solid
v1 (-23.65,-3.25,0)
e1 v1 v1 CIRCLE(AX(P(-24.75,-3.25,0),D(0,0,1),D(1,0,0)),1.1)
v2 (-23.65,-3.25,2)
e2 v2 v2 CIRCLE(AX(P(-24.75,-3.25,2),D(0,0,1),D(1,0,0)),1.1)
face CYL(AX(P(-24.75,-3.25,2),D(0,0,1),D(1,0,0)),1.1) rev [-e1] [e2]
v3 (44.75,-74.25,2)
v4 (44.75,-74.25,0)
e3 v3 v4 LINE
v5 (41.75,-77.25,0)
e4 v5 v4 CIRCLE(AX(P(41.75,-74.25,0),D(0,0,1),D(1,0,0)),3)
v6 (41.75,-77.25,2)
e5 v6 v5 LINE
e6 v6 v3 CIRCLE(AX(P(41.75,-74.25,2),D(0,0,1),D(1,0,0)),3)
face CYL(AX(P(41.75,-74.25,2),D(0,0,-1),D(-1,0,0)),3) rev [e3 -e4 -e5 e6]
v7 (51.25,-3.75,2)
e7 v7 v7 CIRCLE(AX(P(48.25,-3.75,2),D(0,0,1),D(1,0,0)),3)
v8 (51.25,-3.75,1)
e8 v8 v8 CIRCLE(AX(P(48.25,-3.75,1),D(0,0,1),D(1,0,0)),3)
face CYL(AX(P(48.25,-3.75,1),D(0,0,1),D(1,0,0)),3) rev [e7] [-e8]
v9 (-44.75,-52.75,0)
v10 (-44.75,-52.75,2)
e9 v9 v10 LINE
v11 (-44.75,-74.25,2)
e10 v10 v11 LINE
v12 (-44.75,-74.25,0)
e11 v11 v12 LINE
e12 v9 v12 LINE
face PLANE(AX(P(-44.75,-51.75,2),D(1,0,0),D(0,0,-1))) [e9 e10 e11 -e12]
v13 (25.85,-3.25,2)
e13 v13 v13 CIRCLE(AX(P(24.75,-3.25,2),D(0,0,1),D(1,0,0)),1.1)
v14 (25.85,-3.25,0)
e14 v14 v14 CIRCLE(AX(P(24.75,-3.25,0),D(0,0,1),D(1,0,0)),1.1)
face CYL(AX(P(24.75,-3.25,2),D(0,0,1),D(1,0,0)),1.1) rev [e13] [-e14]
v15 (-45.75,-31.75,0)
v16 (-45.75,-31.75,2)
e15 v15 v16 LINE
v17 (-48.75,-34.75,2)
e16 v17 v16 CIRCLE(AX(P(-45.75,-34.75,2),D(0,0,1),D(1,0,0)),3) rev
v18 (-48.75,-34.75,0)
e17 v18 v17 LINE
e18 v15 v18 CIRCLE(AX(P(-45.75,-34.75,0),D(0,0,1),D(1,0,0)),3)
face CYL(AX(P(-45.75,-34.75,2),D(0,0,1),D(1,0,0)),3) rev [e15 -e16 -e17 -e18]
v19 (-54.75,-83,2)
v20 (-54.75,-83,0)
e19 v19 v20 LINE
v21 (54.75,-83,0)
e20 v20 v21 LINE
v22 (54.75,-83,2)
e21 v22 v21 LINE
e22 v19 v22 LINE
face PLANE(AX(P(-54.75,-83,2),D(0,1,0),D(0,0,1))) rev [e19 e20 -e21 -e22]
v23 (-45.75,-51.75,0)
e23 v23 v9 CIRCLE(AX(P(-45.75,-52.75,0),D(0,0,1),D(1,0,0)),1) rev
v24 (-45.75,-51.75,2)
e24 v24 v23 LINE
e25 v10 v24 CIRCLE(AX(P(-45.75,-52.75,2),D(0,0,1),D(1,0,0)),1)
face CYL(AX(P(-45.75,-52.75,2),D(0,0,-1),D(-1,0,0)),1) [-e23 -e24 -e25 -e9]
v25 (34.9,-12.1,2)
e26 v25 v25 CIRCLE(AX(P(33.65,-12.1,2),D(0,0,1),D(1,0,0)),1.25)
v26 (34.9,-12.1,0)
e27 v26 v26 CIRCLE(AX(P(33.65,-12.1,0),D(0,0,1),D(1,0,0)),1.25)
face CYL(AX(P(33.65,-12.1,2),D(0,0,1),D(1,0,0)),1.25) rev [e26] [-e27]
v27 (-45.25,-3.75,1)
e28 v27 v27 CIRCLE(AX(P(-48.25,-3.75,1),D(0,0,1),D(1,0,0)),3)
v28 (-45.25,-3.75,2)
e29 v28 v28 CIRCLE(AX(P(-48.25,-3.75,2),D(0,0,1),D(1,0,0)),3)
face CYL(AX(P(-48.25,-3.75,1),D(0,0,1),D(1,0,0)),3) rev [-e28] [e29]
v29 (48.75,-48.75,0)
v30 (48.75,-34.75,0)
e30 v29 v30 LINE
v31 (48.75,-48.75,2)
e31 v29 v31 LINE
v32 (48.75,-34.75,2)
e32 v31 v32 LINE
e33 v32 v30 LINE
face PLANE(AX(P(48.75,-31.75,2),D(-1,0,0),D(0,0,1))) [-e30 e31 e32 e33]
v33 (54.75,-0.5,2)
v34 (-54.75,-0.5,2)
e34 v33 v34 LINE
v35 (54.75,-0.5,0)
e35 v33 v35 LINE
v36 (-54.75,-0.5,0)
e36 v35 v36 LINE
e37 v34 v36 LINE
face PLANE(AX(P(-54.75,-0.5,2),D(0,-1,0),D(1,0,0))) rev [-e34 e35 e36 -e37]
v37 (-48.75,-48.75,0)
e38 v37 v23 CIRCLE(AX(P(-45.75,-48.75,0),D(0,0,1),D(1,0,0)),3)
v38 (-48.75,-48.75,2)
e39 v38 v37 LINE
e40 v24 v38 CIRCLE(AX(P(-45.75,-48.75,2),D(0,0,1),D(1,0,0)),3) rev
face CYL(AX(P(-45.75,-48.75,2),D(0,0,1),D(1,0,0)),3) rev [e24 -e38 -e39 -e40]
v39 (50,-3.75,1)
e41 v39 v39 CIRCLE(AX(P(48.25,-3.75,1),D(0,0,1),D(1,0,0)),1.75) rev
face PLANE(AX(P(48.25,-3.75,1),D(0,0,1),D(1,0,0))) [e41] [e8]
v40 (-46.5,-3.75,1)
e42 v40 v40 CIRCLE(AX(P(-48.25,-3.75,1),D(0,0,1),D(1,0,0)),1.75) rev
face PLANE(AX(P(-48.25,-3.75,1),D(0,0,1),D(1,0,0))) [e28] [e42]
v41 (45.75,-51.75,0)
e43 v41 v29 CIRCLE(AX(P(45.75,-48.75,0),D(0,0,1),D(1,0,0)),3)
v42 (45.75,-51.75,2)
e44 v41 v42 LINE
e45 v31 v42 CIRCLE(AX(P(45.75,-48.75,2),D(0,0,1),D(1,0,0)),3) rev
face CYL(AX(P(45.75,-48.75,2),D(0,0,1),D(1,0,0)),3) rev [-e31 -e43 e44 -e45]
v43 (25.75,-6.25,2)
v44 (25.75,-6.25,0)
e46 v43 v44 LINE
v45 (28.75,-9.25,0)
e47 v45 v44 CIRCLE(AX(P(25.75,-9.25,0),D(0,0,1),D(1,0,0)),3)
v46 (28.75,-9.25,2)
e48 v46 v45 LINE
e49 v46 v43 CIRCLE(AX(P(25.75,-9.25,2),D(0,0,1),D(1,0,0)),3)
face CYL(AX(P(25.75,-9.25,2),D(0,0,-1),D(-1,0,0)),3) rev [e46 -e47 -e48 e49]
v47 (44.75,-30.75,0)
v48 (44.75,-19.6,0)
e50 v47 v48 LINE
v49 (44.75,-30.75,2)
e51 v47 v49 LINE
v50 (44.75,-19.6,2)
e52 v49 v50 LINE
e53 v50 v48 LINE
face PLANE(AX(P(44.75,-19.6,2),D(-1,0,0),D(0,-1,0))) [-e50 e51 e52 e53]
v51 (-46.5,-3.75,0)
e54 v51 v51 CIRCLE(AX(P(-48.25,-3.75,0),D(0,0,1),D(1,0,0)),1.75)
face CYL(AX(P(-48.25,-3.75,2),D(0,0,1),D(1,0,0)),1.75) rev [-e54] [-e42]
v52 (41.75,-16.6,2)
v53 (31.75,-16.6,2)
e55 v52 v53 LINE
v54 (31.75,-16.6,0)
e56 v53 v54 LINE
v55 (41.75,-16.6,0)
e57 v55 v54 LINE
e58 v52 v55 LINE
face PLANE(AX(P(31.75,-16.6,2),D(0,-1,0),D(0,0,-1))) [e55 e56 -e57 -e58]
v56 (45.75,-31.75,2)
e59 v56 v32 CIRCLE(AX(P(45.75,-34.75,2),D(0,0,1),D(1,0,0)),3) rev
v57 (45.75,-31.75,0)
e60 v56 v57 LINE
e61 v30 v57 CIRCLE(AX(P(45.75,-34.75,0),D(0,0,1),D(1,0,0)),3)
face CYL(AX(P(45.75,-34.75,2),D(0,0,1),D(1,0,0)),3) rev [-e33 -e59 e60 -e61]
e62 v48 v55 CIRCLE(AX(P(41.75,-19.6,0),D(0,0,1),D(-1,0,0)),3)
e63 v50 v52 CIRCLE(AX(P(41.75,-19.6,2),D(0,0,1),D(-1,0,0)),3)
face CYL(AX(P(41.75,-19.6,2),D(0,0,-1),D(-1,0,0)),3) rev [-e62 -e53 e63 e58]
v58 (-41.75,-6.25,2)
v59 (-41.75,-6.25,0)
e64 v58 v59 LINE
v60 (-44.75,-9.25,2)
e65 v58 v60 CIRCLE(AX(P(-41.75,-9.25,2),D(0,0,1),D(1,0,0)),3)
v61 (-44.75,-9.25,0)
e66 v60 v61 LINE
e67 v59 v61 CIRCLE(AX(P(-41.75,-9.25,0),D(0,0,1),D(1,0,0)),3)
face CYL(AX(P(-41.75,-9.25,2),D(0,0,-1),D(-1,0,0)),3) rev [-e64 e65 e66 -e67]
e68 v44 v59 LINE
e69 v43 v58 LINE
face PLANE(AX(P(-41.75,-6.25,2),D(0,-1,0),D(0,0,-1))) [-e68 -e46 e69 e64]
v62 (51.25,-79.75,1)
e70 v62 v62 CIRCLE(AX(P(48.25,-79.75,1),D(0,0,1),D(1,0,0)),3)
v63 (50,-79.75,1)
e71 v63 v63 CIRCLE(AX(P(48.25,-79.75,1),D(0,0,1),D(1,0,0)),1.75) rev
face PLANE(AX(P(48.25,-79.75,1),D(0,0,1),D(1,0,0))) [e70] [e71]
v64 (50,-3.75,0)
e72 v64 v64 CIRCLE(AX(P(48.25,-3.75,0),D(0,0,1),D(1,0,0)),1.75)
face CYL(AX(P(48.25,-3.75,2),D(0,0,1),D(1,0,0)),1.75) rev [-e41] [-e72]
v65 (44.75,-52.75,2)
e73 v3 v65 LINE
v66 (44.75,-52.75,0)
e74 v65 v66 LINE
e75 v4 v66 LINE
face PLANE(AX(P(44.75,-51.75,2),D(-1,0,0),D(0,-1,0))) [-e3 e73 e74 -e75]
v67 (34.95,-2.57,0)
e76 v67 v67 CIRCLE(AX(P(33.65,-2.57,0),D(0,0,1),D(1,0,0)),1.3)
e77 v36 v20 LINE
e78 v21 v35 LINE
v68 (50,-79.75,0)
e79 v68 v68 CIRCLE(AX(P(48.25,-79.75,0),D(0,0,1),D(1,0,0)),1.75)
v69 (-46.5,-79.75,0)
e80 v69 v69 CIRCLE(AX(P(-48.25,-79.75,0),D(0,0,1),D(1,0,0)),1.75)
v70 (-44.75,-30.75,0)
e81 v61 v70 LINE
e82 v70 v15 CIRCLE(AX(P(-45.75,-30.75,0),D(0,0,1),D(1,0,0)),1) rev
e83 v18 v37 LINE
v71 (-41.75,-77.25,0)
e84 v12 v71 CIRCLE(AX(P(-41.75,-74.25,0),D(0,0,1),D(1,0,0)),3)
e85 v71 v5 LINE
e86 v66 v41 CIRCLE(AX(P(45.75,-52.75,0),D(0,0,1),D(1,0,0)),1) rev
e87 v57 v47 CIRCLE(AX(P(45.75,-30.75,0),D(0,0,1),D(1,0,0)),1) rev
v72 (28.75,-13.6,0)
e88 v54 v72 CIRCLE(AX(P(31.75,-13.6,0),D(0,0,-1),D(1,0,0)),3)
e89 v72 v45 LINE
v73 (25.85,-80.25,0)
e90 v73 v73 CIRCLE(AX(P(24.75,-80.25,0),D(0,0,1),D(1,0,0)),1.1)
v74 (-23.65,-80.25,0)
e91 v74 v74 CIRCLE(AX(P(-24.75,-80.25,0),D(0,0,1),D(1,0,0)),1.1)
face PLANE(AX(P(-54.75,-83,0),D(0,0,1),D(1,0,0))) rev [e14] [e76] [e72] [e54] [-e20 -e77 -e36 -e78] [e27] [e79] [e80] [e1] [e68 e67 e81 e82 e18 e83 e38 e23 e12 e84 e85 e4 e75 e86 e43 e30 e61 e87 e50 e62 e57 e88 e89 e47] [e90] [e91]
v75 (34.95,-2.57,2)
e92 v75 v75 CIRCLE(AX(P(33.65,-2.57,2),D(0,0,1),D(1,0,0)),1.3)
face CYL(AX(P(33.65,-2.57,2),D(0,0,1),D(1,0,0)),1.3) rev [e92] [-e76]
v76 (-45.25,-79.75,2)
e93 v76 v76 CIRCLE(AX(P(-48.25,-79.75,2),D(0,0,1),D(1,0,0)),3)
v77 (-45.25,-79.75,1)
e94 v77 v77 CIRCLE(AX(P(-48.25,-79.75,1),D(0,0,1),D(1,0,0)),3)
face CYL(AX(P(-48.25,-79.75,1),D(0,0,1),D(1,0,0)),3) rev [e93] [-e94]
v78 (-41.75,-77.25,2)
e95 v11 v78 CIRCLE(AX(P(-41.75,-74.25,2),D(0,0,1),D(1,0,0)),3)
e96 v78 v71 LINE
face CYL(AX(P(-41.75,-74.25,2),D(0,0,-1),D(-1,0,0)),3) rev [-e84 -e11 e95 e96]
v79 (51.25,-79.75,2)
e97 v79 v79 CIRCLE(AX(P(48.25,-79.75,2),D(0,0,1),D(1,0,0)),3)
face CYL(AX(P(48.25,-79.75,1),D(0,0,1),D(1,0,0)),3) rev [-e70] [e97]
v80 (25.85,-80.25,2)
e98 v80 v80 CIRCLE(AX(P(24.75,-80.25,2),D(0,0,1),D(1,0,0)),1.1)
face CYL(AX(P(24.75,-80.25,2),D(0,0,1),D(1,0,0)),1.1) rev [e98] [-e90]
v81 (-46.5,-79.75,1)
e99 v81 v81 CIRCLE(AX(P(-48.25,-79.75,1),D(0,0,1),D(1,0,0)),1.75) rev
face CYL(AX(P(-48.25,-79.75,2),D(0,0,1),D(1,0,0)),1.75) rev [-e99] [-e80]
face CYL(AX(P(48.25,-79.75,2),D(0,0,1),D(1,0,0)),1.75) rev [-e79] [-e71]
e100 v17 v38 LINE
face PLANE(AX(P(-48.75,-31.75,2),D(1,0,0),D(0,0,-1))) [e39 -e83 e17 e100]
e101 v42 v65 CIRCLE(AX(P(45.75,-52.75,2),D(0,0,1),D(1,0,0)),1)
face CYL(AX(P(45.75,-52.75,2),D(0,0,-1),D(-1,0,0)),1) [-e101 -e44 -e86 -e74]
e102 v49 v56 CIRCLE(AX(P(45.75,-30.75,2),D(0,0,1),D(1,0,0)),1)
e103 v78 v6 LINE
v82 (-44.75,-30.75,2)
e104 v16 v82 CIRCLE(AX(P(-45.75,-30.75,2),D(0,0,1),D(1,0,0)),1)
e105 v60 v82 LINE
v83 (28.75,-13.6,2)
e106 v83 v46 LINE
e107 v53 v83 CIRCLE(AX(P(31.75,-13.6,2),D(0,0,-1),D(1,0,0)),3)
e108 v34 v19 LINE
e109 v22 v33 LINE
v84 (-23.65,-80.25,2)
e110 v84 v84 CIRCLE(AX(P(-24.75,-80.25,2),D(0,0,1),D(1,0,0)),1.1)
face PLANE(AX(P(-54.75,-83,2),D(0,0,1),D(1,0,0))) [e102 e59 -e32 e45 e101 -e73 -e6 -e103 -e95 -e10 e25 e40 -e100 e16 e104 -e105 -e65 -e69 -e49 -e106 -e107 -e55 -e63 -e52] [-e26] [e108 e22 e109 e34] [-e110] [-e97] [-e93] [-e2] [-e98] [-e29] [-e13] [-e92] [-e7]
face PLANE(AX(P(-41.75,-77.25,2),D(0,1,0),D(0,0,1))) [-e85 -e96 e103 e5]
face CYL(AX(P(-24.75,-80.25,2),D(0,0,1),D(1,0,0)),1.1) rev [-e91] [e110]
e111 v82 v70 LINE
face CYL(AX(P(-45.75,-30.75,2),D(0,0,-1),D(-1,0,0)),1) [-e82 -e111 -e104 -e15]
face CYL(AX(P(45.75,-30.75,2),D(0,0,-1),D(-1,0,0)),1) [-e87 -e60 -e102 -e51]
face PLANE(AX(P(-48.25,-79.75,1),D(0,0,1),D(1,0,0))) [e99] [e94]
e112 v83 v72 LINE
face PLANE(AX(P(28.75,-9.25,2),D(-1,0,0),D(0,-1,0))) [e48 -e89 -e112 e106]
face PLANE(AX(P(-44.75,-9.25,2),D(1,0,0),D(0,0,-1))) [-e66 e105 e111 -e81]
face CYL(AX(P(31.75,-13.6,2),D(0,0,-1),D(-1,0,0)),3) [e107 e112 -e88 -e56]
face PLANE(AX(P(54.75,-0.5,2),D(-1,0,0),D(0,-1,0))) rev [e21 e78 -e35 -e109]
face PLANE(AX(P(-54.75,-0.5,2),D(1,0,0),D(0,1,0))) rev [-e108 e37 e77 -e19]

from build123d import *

# Parameters (mm, degrees)
SKETCH1_W                  = 109.5
SKETCH1_H                  = 82.5
BOSS_EXTRUDE1_DEPTH        = 2
F_3_5_3_5_DIAMETER_HOLE1_D = 3.5
F_2_5_2_5_DIAMETER_HOLE1_D = 2.5
F_2_6_2_6_DIAMETER_HOLE1_D = 2.6
SKETCH9_R                  = 3
CUT_EXTRUDE1_DEPTH         = 1
F_2_2_2_2_DIAMETER_HOLE1_D = 2.2
FILLET1_R                  = 1
FILLET2_R                  = 3


with BuildPart() as part:
    # Sketch1 → Boss-Extrude1 (new body)
    with BuildSketch(Plane.XY):
        with Locations((0, -41.75)):
            Rectangle(SKETCH1_W, SKETCH1_H)
        with BuildLine():
            Line((28.75, -9.25), (28.75, -13.6))
            ThreePointArc((28.75, -13.6), (29.628679656, -15.721320344), (31.75, -16.6))
            Line((31.75, -16.6), (41.75, -16.6))
            ThreePointArc((41.75, -16.6), (43.871320344, -17.478679656), (44.75, -19.6))
            Line((44.75, -19.6), (44.75, -31.75))
            Line((44.75, -31.75), (48.75, -31.75))
            Line((48.75, -31.75), (48.75, -41.75))
            Line((48.75, -41.75), (48.75, -51.75))
            Line((48.75, -51.75), (44.75, -51.75))
            Line((44.75, -51.75), (44.75, -74.25))
            ThreePointArc((44.75, -74.25), (43.871320344, -76.371320344), (41.75, -77.25))
            Line((41.75, -77.25), (-41.75, -77.25))
            ThreePointArc((-41.75, -77.25), (-43.871320344, -76.371320344), (-44.75, -74.25))
            Line((-44.75, -74.25), (-44.75, -51.75))
            Line((-44.75, -51.75), (-48.75, -51.75))
            Line((-48.75, -51.75), (-48.75, -31.75))
            Line((-48.75, -31.75), (-44.75, -31.75))
            Line((-44.75, -31.75), (-44.75, -9.25))
            ThreePointArc((-44.75, -9.25), (-43.871320344, -7.128679656), (-41.75, -6.25))
            Line((-41.75, -6.25), (25.75, -6.25))
            ThreePointArc((25.75, -6.25), (27.871320344, -7.128679656), (28.75, -9.25))
        make_face(mode=Mode.SUBTRACT)
    extrude(amount=BOSS_EXTRUDE1_DEPTH)

    # Ø3.5 (3.5) Diameter Hole1 (through all)
    with Locations(Plane.XY.offset(2)):
        with Locations((-48.25, -3.75), (-48.25, -79.75), (48.25, -79.75), (48.25, -3.75)):
            Hole(F_3_5_3_5_DIAMETER_HOLE1_D / 2)

    # Ø2.5 (2.5) Diameter Hole1 (through all)
    with Locations(Plane.XY.offset(2)):
        with Locations((33.65, -12.1)):
            Hole(F_2_5_2_5_DIAMETER_HOLE1_D / 2)

    # Ø2.6 (2.6) Diameter Hole1 (through all)
    with Locations(Plane.XY.offset(2)):
        with Locations((33.65, -2.57)):
            Hole(F_2_6_2_6_DIAMETER_HOLE1_D / 2)

    # Sketch9 → Cut-Extrude1 (cut)
    with BuildSketch(Plane.XY.offset(2)):
        with Locations((-48.25, -3.75)):
            Circle(SKETCH9_R)
        with Locations((48.25, -3.75)):
            Circle(SKETCH9_R)
        with Locations((48.25, -79.75)):
            Circle(SKETCH9_R)
        with Locations((-48.25, -79.75)):
            Circle(SKETCH9_R)
    extrude(amount=-CUT_EXTRUDE1_DEPTH, mode=Mode.SUBTRACT)

    # Ø2.2 (2.2) Diameter Hole1 (through all)
    with Locations(Plane.XY.offset(2)):
        with Locations((-24.75, -3.25), (24.75, -3.25), (-24.75, -80.25), (24.75, -80.25)):
            Hole(F_2_2_2_2_DIAMETER_HOLE1_D / 2)

    # Fillet1
    fillet1_edges = [part.edges().sort_by_distance(p)[0] for p in [
        (-44.75, -31.75, 1),
        (-44.75, -51.75, 1),
        (44.75, -51.75, 1),
        (44.75, -31.75, 1),
    ]]
    fillet(fillet1_edges, radius=FILLET1_R)

    # Fillet2
    fillet2_edges = [part.edges().sort_by_distance(p)[0] for p in [
        (48.75, -31.75, 1),
        (48.75, -51.75, 1),
        (-48.75, -51.75, 1),
        (-48.75, -31.75, 1),
    ]]
    fillet(fillet2_edges, radius=FILLET2_R - 0.0001)  # a hair under: the kernel refuses the full size


solid = part.part
